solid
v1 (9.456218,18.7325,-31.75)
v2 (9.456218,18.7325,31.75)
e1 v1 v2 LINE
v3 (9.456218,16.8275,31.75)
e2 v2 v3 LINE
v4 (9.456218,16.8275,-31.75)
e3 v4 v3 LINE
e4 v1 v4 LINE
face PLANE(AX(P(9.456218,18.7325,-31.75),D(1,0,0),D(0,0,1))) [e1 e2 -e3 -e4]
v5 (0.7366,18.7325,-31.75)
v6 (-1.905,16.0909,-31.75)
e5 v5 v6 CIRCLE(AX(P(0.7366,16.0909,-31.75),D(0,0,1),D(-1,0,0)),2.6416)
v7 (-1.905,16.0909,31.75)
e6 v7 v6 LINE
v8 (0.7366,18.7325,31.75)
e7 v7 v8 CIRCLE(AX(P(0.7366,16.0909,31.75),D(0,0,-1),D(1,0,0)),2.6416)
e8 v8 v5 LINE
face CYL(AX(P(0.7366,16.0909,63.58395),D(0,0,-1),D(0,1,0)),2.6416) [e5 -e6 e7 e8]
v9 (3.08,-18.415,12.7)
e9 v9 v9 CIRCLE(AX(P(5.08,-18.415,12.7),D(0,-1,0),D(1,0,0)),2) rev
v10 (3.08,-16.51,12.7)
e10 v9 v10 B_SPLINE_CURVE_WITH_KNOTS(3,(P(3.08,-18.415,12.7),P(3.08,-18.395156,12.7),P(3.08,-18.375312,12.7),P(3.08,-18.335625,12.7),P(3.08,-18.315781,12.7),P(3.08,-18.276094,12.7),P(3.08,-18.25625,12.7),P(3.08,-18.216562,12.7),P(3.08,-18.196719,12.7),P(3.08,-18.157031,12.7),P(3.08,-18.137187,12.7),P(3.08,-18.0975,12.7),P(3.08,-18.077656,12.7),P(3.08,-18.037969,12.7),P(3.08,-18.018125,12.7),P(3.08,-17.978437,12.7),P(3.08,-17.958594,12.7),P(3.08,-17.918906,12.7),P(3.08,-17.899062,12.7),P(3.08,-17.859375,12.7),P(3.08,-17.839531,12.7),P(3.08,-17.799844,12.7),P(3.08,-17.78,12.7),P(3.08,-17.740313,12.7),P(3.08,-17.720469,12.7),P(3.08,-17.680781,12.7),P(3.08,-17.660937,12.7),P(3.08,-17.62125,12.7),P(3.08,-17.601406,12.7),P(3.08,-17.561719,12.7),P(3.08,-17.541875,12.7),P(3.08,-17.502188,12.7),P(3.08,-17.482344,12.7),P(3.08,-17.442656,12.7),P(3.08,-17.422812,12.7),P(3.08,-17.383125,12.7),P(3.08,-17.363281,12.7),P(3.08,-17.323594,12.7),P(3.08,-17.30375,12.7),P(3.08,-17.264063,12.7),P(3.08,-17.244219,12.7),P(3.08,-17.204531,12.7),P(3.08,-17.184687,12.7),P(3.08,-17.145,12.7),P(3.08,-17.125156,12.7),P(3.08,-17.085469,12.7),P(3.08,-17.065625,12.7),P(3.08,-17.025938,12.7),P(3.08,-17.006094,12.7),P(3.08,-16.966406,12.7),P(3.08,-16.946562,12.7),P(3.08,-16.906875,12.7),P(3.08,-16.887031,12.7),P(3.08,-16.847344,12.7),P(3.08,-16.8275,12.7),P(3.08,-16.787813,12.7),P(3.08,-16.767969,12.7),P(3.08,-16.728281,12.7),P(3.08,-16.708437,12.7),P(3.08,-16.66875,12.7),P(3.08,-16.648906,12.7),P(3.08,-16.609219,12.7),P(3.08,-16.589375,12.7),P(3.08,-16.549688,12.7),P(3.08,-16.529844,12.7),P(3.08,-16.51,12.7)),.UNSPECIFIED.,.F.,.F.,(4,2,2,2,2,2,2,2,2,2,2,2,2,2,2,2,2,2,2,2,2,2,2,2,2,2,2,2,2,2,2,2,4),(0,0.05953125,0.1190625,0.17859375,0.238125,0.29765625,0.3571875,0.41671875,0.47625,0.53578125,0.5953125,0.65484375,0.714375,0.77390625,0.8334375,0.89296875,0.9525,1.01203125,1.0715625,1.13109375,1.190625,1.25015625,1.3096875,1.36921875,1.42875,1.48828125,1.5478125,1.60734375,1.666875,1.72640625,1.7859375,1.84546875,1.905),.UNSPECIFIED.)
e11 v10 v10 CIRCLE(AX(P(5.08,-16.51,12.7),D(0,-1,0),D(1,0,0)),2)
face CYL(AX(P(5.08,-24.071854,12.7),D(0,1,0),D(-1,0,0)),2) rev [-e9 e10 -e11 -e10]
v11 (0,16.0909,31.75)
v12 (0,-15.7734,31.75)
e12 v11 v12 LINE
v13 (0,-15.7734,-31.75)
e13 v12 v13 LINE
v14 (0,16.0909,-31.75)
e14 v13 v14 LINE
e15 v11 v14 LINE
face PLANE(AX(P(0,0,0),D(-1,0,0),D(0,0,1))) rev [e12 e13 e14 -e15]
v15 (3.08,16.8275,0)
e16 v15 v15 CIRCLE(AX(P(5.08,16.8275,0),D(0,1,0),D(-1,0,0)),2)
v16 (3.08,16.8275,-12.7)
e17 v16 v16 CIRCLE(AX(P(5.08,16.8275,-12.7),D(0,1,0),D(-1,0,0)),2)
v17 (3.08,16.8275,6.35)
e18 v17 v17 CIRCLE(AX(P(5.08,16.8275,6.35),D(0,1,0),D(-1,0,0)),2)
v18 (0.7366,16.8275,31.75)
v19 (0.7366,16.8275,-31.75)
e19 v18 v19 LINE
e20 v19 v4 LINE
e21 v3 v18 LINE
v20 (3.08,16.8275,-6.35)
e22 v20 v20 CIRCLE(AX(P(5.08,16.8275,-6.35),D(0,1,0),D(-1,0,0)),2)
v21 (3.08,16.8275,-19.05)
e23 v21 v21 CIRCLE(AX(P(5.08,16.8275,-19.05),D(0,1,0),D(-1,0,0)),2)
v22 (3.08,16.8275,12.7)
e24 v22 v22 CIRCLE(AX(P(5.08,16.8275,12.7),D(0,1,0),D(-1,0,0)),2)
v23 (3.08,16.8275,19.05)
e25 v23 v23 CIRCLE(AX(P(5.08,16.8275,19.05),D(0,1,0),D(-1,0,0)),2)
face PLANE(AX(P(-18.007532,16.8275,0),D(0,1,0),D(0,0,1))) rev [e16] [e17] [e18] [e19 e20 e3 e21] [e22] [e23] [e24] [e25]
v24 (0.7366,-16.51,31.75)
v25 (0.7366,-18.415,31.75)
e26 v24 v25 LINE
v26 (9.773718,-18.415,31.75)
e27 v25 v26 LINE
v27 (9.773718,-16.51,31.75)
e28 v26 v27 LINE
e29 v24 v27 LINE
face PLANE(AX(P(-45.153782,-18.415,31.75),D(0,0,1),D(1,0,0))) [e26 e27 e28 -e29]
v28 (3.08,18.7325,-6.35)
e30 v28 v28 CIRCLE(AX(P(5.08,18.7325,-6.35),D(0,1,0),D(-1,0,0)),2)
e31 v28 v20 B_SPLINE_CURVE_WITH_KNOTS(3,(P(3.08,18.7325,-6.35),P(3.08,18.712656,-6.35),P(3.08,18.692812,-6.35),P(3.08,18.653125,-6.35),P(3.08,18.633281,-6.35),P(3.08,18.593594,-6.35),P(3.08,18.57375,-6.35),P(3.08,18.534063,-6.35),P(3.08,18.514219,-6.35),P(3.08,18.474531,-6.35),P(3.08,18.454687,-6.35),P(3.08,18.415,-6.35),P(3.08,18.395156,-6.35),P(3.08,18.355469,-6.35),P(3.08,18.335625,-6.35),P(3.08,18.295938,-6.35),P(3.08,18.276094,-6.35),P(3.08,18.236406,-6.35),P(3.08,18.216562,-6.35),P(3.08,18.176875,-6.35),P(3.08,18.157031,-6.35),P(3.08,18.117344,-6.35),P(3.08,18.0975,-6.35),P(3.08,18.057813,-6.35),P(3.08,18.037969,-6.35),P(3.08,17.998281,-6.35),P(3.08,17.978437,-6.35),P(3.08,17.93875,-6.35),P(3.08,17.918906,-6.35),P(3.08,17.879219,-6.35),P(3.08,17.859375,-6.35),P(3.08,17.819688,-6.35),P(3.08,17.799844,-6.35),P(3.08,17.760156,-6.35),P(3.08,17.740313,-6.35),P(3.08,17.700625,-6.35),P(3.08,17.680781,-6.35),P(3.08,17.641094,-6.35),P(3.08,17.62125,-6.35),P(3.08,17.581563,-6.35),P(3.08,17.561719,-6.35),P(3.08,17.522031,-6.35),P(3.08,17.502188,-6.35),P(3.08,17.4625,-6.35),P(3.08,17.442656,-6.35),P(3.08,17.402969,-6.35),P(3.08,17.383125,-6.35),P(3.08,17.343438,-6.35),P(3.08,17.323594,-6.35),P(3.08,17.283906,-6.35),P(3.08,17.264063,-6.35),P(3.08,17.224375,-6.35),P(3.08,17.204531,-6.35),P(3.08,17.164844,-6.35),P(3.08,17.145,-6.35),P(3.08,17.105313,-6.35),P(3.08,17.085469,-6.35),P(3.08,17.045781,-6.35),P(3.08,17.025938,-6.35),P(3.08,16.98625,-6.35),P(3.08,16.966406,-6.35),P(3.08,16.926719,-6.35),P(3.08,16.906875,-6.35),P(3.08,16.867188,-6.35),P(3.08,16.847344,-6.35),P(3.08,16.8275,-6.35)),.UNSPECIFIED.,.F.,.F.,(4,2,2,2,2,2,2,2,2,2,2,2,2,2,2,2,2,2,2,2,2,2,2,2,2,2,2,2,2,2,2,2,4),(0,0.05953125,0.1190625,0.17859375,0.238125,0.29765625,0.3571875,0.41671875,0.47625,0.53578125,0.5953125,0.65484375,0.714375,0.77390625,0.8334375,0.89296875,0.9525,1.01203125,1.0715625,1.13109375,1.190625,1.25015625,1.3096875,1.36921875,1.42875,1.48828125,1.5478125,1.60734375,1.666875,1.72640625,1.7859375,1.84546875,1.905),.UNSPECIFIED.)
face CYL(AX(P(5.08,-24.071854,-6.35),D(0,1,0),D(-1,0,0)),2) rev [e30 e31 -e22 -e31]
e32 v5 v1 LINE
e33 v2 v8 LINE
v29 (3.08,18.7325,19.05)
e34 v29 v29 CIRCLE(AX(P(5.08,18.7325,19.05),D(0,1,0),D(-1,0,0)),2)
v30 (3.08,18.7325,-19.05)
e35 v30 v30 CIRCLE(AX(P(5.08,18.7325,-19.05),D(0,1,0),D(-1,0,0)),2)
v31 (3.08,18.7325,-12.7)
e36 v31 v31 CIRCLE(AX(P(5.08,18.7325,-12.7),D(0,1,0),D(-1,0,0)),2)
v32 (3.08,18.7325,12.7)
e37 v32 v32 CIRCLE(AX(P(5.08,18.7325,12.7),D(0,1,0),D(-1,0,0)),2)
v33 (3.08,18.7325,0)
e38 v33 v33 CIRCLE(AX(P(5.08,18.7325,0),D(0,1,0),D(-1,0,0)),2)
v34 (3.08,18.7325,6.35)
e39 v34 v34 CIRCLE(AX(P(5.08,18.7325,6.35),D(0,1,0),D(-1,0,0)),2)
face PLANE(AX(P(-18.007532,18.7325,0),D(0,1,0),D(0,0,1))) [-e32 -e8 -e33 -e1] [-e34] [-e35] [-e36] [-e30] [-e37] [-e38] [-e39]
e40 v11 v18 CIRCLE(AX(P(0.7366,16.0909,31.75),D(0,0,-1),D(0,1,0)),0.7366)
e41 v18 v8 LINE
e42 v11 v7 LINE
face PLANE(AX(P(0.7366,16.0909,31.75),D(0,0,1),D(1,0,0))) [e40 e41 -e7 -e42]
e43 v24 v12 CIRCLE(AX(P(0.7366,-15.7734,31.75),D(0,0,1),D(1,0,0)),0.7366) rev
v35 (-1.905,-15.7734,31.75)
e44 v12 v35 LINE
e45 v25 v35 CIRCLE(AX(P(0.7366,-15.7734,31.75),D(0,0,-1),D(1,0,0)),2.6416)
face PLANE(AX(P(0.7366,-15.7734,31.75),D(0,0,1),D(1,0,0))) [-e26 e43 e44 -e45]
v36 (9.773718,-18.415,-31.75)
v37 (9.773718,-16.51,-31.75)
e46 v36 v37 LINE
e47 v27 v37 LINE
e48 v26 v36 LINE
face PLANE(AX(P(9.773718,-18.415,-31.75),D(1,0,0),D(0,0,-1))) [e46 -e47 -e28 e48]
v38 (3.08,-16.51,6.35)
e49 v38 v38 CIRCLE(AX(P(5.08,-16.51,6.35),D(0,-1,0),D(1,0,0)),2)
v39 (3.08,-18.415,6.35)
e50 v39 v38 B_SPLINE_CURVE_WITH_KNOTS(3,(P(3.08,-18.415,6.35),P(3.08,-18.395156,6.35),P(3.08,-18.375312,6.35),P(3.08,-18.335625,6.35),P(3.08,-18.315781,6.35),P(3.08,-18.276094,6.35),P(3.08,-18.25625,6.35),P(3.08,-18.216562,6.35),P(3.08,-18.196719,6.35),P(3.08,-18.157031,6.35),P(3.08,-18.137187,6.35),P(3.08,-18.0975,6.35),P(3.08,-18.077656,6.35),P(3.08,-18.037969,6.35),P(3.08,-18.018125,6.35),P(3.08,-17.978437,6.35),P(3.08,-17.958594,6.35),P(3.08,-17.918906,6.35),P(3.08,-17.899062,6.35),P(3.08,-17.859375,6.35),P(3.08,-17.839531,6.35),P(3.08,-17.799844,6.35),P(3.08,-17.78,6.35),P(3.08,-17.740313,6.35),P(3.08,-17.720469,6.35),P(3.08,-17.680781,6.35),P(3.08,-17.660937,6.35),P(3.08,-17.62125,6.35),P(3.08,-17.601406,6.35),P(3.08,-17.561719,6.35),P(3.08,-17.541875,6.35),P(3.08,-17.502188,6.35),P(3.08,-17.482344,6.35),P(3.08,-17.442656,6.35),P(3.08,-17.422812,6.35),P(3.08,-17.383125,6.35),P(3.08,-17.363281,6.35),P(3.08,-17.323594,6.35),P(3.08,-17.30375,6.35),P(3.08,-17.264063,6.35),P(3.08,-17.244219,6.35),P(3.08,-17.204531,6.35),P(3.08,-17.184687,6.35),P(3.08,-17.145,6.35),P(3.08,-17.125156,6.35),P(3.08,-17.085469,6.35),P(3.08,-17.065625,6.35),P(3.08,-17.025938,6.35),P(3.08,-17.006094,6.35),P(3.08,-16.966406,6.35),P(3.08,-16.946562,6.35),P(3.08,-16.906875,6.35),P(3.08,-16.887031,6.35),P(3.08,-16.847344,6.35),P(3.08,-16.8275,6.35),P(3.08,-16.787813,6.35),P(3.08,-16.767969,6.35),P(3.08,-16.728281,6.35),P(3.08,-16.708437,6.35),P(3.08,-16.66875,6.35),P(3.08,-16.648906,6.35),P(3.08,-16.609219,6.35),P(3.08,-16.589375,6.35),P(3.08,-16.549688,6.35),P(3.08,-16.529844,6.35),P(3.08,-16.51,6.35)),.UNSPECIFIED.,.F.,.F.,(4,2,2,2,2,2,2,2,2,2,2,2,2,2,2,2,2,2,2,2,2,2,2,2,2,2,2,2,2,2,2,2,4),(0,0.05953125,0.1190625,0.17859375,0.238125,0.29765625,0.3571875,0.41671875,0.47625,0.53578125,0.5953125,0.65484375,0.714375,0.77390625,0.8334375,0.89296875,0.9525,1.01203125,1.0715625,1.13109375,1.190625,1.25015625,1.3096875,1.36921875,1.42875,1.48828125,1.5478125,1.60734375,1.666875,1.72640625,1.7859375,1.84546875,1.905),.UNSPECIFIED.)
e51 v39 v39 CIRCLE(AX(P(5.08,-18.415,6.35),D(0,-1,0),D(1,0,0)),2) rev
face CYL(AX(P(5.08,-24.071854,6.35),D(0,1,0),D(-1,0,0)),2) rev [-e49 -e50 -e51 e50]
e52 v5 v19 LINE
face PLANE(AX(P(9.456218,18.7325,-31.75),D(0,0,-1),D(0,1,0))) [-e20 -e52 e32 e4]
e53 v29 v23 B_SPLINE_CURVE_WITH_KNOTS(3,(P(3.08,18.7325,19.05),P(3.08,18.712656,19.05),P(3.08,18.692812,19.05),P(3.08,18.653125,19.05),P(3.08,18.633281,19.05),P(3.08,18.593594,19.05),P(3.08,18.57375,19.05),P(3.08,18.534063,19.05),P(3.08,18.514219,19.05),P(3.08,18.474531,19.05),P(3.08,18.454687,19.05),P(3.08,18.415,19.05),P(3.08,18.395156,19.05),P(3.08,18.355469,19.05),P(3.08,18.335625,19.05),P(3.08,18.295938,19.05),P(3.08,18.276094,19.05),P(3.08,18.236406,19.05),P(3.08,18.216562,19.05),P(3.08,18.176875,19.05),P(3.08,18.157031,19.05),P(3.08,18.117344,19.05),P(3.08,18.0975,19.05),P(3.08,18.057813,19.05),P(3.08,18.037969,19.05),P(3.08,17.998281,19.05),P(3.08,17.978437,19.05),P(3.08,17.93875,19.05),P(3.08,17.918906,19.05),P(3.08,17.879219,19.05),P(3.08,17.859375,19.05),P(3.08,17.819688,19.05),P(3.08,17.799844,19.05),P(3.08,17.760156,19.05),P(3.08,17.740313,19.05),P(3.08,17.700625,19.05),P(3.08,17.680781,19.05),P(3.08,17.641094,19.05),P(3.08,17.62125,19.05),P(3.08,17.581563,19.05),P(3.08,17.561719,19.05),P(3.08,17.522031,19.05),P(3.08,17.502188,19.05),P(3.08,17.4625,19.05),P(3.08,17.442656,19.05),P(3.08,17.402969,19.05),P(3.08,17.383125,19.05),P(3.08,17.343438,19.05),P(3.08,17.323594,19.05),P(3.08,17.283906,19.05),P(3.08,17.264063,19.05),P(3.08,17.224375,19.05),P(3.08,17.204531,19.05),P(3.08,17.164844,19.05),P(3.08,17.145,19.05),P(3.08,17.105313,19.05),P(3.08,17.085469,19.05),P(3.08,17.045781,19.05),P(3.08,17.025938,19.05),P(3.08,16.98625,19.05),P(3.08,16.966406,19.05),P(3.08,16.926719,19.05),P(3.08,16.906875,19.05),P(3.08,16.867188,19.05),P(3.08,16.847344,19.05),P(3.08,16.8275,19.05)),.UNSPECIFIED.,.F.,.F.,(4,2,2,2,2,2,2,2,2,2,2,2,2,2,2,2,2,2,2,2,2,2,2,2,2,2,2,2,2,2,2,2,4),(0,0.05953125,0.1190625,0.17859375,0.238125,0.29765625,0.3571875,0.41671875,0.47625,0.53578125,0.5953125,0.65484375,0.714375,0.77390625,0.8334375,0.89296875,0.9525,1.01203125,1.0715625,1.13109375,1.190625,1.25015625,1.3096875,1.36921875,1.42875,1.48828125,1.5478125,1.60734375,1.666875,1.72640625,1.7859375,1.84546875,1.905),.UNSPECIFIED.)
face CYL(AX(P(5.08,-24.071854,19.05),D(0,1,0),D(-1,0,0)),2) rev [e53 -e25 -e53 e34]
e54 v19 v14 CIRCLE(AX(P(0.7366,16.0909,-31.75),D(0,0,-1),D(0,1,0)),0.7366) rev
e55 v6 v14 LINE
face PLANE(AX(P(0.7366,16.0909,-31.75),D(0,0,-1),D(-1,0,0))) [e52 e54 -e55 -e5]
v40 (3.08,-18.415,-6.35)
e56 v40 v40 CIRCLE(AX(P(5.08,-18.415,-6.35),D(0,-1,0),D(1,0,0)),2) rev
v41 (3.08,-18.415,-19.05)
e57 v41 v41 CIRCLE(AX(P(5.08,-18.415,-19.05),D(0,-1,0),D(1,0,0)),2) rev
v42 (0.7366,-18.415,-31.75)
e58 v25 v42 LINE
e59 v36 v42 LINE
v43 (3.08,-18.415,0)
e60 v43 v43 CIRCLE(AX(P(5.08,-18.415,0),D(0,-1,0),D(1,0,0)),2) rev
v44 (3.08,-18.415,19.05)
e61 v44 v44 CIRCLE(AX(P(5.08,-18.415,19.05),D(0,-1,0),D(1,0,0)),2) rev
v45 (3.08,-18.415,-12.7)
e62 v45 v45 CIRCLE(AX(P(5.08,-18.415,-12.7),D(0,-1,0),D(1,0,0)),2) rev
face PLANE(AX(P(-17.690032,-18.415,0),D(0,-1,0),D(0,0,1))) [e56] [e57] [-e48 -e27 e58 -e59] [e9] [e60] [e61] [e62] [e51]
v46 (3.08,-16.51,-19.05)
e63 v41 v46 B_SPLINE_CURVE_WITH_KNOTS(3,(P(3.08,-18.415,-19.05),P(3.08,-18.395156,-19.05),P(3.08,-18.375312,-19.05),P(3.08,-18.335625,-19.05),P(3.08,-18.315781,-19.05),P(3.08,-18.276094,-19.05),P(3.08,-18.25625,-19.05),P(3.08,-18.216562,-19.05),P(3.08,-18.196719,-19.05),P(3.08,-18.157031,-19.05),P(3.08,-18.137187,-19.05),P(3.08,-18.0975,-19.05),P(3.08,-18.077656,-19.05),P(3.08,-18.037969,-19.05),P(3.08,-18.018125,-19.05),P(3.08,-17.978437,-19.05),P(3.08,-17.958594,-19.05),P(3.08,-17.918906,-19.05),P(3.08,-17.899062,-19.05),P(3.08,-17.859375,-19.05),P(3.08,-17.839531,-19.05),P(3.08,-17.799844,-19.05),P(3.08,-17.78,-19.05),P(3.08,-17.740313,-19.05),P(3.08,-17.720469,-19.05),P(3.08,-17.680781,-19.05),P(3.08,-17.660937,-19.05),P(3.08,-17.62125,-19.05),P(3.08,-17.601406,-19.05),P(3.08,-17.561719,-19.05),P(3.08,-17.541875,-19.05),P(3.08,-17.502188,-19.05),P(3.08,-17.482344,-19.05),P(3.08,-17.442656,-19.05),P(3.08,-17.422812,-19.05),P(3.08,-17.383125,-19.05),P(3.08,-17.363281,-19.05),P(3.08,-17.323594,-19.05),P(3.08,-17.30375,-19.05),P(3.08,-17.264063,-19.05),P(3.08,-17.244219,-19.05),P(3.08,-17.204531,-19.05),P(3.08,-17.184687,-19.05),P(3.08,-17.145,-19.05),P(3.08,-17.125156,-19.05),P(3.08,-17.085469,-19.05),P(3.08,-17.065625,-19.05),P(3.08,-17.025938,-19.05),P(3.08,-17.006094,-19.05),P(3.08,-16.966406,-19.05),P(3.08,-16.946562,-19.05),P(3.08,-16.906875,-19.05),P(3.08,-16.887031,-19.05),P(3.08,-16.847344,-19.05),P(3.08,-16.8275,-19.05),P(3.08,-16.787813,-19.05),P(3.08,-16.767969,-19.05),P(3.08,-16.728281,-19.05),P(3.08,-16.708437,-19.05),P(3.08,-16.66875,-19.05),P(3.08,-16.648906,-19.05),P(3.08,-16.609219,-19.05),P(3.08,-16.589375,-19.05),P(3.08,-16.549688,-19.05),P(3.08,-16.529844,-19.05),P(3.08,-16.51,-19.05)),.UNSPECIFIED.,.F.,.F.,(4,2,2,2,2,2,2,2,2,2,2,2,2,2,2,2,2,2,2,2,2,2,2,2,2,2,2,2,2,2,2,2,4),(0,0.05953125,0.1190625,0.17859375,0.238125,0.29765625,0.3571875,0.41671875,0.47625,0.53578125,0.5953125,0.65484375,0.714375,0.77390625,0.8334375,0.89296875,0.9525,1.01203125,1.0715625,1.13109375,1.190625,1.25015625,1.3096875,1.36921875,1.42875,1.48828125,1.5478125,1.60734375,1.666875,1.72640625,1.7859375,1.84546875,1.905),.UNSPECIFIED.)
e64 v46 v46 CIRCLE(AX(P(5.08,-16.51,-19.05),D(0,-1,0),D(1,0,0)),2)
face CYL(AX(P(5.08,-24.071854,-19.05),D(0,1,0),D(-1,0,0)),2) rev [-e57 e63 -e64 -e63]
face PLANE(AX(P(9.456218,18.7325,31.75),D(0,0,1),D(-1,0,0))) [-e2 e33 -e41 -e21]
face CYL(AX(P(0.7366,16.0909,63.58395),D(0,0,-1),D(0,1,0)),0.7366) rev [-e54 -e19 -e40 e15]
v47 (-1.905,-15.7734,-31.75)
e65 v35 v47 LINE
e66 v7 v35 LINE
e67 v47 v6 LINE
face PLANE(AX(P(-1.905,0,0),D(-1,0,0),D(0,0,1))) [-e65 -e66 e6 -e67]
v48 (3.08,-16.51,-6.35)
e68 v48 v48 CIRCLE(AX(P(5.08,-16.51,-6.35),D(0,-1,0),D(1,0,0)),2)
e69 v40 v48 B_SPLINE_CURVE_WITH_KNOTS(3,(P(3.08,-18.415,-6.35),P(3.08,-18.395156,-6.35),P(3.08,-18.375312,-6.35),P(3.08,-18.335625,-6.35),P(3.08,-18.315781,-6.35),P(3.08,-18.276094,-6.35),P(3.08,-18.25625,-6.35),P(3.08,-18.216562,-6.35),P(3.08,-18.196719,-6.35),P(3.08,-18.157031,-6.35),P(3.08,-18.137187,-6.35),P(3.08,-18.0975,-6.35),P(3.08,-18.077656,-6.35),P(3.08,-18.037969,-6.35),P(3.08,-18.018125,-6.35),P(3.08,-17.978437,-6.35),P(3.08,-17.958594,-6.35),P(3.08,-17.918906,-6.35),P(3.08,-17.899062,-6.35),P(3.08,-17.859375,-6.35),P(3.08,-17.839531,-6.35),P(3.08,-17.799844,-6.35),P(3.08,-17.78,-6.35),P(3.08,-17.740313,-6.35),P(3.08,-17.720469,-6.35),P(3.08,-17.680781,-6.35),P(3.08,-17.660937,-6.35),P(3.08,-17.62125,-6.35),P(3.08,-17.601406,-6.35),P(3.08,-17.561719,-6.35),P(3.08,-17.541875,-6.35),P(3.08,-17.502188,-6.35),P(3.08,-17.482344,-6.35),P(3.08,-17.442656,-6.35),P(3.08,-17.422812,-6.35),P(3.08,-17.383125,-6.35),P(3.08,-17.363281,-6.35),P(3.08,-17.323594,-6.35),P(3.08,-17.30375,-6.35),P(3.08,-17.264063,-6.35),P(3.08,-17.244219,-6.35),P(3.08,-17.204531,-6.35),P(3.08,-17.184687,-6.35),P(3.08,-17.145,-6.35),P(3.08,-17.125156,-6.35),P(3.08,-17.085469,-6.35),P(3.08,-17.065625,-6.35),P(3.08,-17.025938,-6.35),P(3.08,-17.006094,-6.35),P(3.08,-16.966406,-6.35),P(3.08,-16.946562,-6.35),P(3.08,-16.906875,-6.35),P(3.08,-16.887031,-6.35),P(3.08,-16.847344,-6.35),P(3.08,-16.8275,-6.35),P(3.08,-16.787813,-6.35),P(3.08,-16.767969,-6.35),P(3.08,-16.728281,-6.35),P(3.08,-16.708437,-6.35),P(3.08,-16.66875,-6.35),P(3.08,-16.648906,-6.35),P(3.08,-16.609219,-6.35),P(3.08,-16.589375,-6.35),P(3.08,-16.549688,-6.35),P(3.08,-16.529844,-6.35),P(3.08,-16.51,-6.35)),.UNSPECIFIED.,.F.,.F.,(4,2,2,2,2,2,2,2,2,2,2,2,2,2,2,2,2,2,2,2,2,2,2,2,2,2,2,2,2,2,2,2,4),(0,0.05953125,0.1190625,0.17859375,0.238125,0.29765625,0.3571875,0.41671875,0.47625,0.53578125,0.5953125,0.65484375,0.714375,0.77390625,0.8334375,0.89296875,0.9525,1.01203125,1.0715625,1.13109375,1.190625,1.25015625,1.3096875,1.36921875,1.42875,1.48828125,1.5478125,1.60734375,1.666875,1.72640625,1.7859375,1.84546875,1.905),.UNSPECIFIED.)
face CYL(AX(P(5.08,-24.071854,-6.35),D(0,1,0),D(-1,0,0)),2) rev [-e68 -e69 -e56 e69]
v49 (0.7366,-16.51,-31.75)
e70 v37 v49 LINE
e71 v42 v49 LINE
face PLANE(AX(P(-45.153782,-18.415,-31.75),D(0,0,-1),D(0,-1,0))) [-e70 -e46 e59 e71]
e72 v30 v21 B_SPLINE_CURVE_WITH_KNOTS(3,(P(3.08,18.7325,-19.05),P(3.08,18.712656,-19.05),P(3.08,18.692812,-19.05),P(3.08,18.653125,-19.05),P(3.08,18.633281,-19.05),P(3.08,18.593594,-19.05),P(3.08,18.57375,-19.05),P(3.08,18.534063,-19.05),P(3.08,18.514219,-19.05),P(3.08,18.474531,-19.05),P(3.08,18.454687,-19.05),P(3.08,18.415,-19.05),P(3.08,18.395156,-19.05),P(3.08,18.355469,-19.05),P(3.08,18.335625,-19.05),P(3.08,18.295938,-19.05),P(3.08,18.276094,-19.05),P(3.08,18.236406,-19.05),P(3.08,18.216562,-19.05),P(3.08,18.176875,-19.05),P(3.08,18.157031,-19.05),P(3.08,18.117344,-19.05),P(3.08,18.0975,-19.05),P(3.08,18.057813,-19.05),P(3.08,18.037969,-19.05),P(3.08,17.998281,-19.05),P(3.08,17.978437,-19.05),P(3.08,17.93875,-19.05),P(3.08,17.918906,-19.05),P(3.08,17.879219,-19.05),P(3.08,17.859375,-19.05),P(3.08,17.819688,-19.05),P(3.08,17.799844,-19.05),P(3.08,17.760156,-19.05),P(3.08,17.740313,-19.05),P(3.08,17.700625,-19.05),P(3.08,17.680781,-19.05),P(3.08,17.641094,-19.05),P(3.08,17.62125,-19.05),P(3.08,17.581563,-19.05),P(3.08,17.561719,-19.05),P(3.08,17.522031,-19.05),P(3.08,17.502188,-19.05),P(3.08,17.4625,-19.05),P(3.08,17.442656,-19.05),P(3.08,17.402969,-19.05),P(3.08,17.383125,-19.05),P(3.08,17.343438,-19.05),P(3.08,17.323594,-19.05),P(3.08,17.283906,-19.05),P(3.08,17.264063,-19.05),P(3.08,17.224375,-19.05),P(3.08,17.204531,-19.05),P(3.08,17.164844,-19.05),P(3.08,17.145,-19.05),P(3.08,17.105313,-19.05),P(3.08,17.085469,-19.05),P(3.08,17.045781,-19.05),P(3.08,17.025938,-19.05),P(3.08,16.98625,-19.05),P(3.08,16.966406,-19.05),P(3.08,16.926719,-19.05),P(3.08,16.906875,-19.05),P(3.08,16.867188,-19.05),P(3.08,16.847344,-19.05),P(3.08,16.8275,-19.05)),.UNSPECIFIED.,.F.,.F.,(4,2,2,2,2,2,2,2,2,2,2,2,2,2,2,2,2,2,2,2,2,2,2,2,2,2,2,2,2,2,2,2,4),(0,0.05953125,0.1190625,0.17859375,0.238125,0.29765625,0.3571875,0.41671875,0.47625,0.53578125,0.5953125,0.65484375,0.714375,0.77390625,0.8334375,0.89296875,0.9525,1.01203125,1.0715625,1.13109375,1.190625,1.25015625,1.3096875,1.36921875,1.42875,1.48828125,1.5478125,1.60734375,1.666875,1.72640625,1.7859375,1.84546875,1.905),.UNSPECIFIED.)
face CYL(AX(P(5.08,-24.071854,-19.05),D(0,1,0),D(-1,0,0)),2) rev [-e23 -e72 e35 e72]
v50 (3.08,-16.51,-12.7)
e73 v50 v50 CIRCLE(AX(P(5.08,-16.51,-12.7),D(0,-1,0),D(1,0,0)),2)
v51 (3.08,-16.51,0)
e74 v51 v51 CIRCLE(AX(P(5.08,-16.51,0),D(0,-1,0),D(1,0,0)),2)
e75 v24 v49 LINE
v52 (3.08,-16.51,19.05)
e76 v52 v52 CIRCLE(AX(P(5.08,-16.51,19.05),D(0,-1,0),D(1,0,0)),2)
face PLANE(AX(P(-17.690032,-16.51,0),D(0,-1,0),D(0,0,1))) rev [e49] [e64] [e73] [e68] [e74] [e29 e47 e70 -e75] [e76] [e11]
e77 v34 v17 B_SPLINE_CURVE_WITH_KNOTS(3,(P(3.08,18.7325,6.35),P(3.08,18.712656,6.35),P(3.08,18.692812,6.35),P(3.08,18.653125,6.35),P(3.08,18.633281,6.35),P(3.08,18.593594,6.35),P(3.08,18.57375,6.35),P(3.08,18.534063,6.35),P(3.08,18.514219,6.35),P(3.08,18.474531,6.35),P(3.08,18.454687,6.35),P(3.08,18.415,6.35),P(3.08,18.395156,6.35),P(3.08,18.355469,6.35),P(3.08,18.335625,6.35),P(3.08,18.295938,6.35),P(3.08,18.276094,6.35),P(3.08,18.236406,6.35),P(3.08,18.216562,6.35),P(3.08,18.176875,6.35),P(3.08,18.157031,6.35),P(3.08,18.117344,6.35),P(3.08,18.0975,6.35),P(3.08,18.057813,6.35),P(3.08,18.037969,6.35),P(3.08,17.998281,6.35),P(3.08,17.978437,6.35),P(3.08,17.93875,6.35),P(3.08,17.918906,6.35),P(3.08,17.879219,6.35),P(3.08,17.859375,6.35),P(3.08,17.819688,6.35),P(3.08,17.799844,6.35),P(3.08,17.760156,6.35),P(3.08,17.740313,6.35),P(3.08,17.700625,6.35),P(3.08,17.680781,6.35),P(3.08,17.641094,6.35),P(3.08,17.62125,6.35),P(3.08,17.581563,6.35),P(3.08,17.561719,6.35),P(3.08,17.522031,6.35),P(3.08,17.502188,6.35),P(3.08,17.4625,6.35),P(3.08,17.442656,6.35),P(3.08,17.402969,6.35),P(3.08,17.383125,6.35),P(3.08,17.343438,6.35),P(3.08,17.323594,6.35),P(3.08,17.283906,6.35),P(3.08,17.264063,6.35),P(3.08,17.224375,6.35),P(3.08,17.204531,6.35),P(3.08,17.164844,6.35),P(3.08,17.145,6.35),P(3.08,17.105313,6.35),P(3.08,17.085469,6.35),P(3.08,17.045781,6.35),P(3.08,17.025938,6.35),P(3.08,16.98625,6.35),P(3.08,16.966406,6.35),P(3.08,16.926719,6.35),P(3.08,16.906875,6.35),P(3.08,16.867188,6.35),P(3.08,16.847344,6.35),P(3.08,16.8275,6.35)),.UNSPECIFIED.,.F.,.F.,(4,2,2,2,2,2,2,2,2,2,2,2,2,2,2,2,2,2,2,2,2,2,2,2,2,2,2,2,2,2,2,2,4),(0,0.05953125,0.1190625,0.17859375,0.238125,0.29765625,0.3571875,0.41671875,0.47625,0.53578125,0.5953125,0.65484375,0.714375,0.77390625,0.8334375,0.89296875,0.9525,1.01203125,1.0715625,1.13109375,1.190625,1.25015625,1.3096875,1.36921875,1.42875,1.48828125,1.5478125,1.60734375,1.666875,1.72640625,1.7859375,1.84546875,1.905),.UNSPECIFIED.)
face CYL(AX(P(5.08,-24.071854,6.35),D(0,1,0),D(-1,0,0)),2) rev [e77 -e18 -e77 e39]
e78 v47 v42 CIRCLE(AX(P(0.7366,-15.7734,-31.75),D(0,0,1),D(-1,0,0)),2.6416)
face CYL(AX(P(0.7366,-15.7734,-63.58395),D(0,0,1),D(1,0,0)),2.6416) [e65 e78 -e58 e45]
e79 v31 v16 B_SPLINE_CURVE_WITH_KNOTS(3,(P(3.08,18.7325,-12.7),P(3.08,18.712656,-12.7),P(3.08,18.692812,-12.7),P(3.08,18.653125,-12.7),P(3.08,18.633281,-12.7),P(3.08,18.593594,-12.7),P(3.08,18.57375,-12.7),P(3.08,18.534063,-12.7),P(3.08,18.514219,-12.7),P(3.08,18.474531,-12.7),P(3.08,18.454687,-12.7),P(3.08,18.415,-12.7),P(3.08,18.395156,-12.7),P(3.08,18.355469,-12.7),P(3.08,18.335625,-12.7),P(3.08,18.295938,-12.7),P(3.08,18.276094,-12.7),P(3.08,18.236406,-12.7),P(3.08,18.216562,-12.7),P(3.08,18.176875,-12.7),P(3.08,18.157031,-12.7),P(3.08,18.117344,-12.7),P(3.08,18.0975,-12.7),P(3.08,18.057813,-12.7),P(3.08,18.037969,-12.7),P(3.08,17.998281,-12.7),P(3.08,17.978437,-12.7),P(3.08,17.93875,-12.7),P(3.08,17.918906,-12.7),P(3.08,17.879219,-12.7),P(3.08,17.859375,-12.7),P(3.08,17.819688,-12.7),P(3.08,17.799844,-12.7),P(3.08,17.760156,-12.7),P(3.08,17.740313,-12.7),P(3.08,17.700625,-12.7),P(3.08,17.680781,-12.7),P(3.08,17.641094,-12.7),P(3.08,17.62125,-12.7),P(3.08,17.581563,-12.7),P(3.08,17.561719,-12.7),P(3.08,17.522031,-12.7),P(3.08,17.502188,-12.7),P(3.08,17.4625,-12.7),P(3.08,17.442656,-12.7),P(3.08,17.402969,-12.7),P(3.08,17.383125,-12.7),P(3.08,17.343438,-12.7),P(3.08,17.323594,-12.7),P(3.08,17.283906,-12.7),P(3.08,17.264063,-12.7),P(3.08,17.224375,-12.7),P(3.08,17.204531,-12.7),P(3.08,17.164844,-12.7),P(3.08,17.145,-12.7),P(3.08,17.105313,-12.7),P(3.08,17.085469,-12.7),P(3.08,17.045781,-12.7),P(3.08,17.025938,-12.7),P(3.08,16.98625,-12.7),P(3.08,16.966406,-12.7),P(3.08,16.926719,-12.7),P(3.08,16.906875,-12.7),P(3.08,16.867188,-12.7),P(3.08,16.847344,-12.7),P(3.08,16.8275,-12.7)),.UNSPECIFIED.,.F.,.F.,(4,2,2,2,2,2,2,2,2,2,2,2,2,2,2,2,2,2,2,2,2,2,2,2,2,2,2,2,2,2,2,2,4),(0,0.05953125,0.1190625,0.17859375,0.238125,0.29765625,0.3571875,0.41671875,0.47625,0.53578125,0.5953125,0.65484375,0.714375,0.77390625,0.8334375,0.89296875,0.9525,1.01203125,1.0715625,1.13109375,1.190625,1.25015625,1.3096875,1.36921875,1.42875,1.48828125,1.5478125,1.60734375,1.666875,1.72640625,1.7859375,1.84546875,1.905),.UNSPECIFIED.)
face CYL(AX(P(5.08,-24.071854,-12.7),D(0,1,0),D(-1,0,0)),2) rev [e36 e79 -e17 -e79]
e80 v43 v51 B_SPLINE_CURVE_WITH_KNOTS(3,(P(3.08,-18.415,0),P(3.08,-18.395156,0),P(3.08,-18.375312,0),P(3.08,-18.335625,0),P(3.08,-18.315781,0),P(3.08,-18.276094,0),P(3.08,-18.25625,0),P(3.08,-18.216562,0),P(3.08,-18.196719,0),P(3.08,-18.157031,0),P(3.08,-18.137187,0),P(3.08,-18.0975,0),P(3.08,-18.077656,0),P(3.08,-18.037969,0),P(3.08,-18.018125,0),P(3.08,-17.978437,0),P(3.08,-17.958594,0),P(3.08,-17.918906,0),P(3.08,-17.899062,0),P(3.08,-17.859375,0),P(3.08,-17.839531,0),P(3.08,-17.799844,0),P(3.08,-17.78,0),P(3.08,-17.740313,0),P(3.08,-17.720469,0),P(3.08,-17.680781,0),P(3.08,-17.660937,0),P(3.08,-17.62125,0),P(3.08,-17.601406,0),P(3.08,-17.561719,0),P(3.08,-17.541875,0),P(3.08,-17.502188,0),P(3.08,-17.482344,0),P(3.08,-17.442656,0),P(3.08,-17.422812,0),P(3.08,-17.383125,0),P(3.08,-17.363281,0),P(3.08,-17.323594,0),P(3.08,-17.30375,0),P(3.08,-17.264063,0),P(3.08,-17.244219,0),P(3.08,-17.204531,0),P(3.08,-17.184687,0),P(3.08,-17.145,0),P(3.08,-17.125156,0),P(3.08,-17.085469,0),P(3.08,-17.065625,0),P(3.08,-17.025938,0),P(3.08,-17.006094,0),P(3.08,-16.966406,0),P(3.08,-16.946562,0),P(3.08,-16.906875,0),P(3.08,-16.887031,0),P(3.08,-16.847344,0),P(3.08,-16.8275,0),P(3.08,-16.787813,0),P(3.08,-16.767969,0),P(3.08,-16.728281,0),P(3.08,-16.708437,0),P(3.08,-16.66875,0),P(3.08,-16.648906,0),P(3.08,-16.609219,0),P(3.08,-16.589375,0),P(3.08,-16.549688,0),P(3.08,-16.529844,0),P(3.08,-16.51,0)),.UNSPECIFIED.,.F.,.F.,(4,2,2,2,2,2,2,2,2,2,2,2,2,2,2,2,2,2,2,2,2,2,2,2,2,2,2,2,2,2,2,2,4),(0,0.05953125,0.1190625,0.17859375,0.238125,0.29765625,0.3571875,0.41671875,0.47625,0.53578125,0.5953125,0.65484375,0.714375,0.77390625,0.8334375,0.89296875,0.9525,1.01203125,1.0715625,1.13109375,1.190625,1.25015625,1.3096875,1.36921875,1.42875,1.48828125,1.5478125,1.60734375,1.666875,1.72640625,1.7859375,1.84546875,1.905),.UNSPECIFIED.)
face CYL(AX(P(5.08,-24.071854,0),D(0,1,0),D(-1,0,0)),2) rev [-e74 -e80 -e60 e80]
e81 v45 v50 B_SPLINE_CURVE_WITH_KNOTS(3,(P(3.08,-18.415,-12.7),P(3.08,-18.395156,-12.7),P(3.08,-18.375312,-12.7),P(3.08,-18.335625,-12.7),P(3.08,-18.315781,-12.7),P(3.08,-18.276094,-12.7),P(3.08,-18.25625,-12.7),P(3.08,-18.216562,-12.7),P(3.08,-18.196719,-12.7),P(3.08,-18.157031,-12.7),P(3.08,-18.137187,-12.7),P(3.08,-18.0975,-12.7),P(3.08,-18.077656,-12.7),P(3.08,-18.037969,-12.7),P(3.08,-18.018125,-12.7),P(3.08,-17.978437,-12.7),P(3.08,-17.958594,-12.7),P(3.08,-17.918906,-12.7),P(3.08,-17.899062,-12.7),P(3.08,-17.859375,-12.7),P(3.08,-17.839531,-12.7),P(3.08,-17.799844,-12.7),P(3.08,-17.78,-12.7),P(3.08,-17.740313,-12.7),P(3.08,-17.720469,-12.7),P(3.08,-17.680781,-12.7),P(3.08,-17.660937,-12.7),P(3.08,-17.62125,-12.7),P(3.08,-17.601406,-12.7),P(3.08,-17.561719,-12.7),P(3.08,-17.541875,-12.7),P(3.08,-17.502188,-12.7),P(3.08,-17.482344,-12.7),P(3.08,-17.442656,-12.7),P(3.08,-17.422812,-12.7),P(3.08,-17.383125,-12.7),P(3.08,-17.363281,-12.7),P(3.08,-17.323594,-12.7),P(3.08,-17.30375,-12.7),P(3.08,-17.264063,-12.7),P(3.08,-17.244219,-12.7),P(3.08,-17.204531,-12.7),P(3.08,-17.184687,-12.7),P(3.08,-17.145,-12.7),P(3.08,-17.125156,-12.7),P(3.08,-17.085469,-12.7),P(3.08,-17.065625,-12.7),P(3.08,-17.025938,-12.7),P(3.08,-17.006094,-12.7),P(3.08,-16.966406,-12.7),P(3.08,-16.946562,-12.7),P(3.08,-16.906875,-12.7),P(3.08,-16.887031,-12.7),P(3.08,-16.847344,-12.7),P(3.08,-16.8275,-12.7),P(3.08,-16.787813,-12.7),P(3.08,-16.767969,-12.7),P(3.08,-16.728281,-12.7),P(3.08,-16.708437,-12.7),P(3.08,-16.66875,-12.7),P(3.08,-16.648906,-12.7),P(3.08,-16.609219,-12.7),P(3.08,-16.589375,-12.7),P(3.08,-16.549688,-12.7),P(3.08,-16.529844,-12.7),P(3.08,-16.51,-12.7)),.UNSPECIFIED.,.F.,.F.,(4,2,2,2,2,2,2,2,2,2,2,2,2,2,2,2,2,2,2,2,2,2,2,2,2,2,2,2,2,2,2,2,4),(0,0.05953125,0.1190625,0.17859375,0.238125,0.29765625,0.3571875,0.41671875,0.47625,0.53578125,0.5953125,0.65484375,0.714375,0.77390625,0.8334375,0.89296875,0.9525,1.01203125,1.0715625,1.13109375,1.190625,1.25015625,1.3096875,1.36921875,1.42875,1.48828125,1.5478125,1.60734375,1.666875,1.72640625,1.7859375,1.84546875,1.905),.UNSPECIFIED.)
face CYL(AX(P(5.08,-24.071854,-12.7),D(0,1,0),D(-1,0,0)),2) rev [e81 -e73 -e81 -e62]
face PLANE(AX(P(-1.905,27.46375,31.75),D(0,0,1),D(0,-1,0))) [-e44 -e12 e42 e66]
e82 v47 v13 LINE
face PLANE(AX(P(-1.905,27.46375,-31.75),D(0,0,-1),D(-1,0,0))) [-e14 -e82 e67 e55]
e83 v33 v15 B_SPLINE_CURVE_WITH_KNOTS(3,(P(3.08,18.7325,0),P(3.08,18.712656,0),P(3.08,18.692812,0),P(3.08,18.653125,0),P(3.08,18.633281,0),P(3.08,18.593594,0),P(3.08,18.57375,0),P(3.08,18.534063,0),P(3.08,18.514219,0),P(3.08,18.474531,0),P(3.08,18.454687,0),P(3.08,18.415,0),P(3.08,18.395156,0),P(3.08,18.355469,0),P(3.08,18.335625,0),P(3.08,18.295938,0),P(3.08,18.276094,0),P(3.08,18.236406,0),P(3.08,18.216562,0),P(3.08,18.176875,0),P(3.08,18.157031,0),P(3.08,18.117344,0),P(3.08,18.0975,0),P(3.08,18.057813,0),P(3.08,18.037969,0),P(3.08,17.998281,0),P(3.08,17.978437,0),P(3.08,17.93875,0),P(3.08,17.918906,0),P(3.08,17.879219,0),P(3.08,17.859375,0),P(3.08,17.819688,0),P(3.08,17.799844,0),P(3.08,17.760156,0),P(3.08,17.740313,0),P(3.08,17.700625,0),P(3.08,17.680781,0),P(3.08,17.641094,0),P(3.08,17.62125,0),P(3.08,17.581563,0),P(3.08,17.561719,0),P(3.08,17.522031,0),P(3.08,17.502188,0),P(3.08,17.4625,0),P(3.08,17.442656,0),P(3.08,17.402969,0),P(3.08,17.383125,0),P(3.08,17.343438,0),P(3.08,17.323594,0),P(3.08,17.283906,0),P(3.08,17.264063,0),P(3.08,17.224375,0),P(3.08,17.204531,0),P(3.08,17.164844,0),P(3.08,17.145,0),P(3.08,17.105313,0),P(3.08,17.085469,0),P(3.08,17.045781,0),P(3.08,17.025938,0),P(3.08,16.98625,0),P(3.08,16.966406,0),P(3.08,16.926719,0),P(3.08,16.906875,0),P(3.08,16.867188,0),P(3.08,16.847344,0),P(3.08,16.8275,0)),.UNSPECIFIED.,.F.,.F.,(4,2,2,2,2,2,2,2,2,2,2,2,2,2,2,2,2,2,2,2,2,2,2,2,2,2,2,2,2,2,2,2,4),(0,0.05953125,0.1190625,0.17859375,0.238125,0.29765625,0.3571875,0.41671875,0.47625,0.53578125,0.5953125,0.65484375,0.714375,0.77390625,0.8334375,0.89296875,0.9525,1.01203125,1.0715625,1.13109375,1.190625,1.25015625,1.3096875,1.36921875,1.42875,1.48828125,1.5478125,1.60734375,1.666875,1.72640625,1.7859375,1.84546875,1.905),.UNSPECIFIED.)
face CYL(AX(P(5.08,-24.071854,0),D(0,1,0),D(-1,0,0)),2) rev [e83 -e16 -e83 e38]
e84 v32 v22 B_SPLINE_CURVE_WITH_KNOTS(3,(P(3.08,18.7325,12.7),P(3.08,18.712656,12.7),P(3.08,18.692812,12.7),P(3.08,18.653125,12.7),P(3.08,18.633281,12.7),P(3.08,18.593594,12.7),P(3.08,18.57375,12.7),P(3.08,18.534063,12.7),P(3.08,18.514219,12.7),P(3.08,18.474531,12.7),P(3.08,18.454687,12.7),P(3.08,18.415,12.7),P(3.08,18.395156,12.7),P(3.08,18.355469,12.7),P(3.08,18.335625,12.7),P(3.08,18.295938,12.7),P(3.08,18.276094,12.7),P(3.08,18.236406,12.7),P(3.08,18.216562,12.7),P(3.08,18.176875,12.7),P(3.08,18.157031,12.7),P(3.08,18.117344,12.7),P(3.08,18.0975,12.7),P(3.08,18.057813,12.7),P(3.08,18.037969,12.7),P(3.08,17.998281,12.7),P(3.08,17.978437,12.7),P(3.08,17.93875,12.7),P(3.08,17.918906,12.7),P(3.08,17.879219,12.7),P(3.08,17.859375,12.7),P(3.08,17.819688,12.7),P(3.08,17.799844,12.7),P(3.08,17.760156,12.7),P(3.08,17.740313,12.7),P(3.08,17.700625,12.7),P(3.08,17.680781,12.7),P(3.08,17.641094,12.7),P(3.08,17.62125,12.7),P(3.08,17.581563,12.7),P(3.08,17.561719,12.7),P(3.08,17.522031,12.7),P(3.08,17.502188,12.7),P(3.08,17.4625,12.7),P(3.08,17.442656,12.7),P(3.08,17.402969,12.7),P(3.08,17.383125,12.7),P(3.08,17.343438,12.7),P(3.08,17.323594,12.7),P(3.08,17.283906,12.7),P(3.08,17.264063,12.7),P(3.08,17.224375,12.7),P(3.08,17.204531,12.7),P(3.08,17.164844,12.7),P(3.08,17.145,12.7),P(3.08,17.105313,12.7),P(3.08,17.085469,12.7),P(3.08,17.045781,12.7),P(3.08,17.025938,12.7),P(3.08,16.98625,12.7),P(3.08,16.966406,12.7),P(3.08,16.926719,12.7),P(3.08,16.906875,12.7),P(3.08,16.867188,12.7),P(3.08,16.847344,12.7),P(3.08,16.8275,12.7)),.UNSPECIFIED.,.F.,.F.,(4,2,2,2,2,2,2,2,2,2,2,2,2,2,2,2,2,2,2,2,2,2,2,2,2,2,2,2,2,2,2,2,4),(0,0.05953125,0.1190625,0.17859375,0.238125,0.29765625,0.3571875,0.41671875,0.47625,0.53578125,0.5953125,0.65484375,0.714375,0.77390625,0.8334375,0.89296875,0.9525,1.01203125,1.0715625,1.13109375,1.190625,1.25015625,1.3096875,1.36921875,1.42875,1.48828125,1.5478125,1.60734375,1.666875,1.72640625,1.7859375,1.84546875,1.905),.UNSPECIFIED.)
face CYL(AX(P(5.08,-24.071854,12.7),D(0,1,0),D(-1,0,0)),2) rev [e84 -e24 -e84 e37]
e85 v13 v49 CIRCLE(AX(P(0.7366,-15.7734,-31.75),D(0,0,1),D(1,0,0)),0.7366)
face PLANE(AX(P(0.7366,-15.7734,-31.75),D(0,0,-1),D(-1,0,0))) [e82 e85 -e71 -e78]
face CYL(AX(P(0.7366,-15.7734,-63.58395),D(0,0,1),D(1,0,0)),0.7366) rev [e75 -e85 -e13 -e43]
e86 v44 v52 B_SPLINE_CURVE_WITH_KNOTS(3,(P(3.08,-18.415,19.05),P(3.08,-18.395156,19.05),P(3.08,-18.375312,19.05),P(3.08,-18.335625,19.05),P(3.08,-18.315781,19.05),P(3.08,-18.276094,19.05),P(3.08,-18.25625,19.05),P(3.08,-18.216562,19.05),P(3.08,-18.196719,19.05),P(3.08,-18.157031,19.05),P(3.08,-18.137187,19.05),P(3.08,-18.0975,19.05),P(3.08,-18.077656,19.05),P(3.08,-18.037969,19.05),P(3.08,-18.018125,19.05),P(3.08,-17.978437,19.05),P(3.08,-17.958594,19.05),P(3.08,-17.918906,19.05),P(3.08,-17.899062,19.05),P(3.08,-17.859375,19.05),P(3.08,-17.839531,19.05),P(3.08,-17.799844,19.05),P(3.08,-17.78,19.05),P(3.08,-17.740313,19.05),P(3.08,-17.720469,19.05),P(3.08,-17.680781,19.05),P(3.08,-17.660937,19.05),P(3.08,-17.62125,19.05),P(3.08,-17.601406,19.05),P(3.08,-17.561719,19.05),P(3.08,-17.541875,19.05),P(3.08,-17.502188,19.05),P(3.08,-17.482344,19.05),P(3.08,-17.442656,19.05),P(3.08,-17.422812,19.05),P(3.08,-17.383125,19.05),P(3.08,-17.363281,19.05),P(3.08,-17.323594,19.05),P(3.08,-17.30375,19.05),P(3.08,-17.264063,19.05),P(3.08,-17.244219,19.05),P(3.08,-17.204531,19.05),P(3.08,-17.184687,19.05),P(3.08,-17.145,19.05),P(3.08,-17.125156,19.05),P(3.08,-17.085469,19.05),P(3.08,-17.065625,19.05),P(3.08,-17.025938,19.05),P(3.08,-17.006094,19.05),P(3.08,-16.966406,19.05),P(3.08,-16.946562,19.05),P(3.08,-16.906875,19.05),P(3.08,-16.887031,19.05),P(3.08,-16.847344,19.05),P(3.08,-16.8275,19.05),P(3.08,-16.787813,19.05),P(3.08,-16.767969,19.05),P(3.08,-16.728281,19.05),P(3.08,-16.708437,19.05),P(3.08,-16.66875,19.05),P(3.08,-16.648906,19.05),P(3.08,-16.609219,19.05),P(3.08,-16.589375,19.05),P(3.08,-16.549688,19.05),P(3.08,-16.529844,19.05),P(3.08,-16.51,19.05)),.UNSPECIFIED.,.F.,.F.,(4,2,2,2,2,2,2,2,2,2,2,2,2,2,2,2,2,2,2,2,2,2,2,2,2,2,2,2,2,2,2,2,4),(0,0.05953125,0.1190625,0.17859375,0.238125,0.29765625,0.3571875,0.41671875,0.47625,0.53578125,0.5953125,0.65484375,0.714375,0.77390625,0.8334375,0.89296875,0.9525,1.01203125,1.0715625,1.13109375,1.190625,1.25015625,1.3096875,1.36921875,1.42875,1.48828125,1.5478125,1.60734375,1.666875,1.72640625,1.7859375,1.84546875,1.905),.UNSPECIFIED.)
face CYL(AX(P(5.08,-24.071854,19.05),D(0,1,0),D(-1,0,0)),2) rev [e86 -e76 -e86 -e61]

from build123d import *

# Parameters (mm, degrees)
SKETCH4_W              = 63.5
SKETCH4_H              = 54.9275
BASE_FLANGE1_DEPTH     = 1.905
SKETCHED_START         = -31.75
SKETCHED_BEND3_DEPTH   = 63.5
SKETCHED_BEND3_2_DEPTH = 63.5
CUT_EXTRUDE2_REACH     = 51.835
SKETCH20_R             = 2


# Read off the part's stored shape, not the designer's step: Sketched Bend3
# Sheet-metal steps are written as plain solids
with BuildPart() as part:
    # Sketch4 → Base-Flange1 (new body)
    with BuildSketch(Plane(origin=(0, 0, 0), x_dir=(0, 0, -1), z_dir=(1, 0, 0))):
        Rectangle(SKETCH4_W, SKETCH4_H)
    extrude(amount=-BASE_FLANGE1_DEPTH)

    # Sketched Bend3 outline → Sketched Bend3 (cut)
    with BuildSketch(Plane.XY.offset(SKETCHED_START)):
        with BuildLine():
            ThreePointArc((0, -18.310223013), (-1.375727285, -17.359629491), (-1.905, -15.7734))
            Line((-1.905, -15.7734), (-1.905, -27.46375))
            Line((-1.905, -27.46375), (0, -27.46375))
            Line((0, -27.46375), (0, -18.310223013))
        make_face()
        with BuildLine():
            Line((-1.905, 27.46375), (-1.905, 16.0909))
            ThreePointArc((-1.905, 16.0909), (-1.375727285, 17.677129491), (0, 18.627723013))
            Line((0, 18.627723013), (0, 27.46375))
            Line((0, 27.46375), (-1.905, 27.46375))
        make_face()
    extrude(amount=SKETCHED_BEND3_DEPTH, mode=Mode.SUBTRACT)

    # Sketched Bend3 2 outline → Sketched Bend3 2 (add)
    with BuildSketch(Plane.XY.offset(SKETCHED_START)):
        with BuildLine():
            Line((0, -15.7734), (0, -18.310223013))
            ThreePointArc((0, -18.310223013), (0.364592683, -18.388674577), (0.7366, -18.415))
            Line((0.7366, -18.415), (9.773717924, -18.415))
            Line((9.773717924, -18.415), (9.773717924, -16.51))
            Line((9.773717924, -16.51), (0.7366, -16.51))
            ThreePointArc((0.7366, -16.51), (0.215745145, -16.294254855), (0, -15.7734))
        make_face()
        with BuildLine():
            ThreePointArc((0.7366, 18.7325), (0.364592683, 18.706174577), (0, 18.627723013))
            Line((0, 18.627723013), (0, 16.0909))
            ThreePointArc((0, 16.0909), (0.215745145, 16.611754855), (0.7366, 16.8275))
            Line((0.7366, 16.8275), (9.456217924, 16.8275))
            Line((9.456217924, 16.8275), (9.456217924, 18.7325))
            Line((9.456217924, 18.7325), (0.7366, 18.7325))
        make_face()
    extrude(amount=SKETCHED_BEND3_2_DEPTH)

    # Cut-Extrude2: up to this face of the body (flat: up to its plane)
    cut_extrude2_end = Plane(part.part.faces().sort_by_distance((5.255158962, -18.415, 0))[0])
    # Sketch20 → Cut-Extrude2 (cut, up to the picked face)
    with BuildSketch(Plane(origin=(0, 18.7325, 0), x_dir=(1, 0, 0), z_dir=(0, 1, 0)), mode=Mode.PRIVATE) as cut_extrude2_sk1:
        with Locations(Location((5.08, -6.35, 0), (0, 0, 180))):
            Circle(SKETCH20_R)
    cut_extrude2_tool1 = split(extrude(cut_extrude2_sk1.sketch, amount=-CUT_EXTRUDE2_REACH, mode=Mode.PRIVATE), bisect_by=cut_extrude2_end, keep=Keep.BOTH, mode=Mode.PRIVATE)
    # Sketch20 → Cut-Extrude2 (cut, up to the picked face)
    with BuildSketch(Plane(origin=(0, 18.7325, 0), x_dir=(1, 0, 0), z_dir=(0, 1, 0)), mode=Mode.PRIVATE) as cut_extrude2_sk2:
        with Locations(Location((5.08, 0, 0), (0, 0, 180))):
            Circle(SKETCH20_R)
    cut_extrude2_tool2 = split(extrude(cut_extrude2_sk2.sketch, amount=-CUT_EXTRUDE2_REACH, mode=Mode.PRIVATE), bisect_by=cut_extrude2_end, keep=Keep.BOTH, mode=Mode.PRIVATE)
    # Sketch20 → Cut-Extrude2 (cut, up to the picked face)
    with BuildSketch(Plane(origin=(0, 18.7325, 0), x_dir=(1, 0, 0), z_dir=(0, 1, 0)), mode=Mode.PRIVATE) as cut_extrude2_sk3:
        with Locations(Location((5.08, 6.35, 0), (0, 0, 180))):
            Circle(SKETCH20_R)
    cut_extrude2_tool3 = split(extrude(cut_extrude2_sk3.sketch, amount=-CUT_EXTRUDE2_REACH, mode=Mode.PRIVATE), bisect_by=cut_extrude2_end, keep=Keep.BOTH, mode=Mode.PRIVATE)
    # Sketch20 → Cut-Extrude2 (cut, up to the picked face)
    with BuildSketch(Plane(origin=(0, 18.7325, 0), x_dir=(1, 0, 0), z_dir=(0, 1, 0)), mode=Mode.PRIVATE) as cut_extrude2_sk4:
        with Locations(Location((5.08, 12.7, 0), (0, 0, 180))):
            Circle(SKETCH20_R)
    cut_extrude2_tool4 = split(extrude(cut_extrude2_sk4.sketch, amount=-CUT_EXTRUDE2_REACH, mode=Mode.PRIVATE), bisect_by=cut_extrude2_end, keep=Keep.BOTH, mode=Mode.PRIVATE)
    # Sketch20 → Cut-Extrude2 (cut, up to the picked face)
    with BuildSketch(Plane(origin=(0, 18.7325, 0), x_dir=(1, 0, 0), z_dir=(0, 1, 0)), mode=Mode.PRIVATE) as cut_extrude2_sk5:
        with Locations(Location((5.08, 19.05, 0), (0, 0, 180))):
            Circle(SKETCH20_R)
    cut_extrude2_tool5 = split(extrude(cut_extrude2_sk5.sketch, amount=-CUT_EXTRUDE2_REACH, mode=Mode.PRIVATE), bisect_by=cut_extrude2_end, keep=Keep.BOTH, mode=Mode.PRIVATE)
    # Sketch20 → Cut-Extrude2 (cut, up to the picked face)
    with BuildSketch(Plane(origin=(0, 18.7325, 0), x_dir=(1, 0, 0), z_dir=(0, 1, 0)), mode=Mode.PRIVATE) as cut_extrude2_sk6:
        with Locations(Location((5.08, -12.7, 0), (0, 0, 180))):
            Circle(SKETCH20_R)
    cut_extrude2_tool6 = split(extrude(cut_extrude2_sk6.sketch, amount=-CUT_EXTRUDE2_REACH, mode=Mode.PRIVATE), bisect_by=cut_extrude2_end, keep=Keep.BOTH, mode=Mode.PRIVATE)
    # Sketch20 → Cut-Extrude2 (cut, up to the picked face)
    with BuildSketch(Plane(origin=(0, 18.7325, 0), x_dir=(1, 0, 0), z_dir=(0, 1, 0)), mode=Mode.PRIVATE) as cut_extrude2_sk7:
        with Locations(Location((5.08, -19.05, 0), (0, 0, 180))):
            Circle(SKETCH20_R)
    cut_extrude2_tool7 = split(extrude(cut_extrude2_sk7.sketch, amount=-CUT_EXTRUDE2_REACH, mode=Mode.PRIVATE), bisect_by=cut_extrude2_end, keep=Keep.BOTH, mode=Mode.PRIVATE)
    add(cut_extrude2_tool1.solids().sort_by(Axis((5.08, 18.7325, 6.35), (0, -1, 0)))[0], mode=Mode.SUBTRACT)
    add(cut_extrude2_tool2.solids().sort_by(Axis((5.08, 18.7325, 0), (0, -1, 0)))[0], mode=Mode.SUBTRACT)
    add(cut_extrude2_tool3.solids().sort_by(Axis((5.08, 18.7325, -6.35), (0, -1, 0)))[0], mode=Mode.SUBTRACT)
    add(cut_extrude2_tool4.solids().sort_by(Axis((5.08, 18.7325, -12.7), (0, -1, 0)))[0], mode=Mode.SUBTRACT)
    add(cut_extrude2_tool5.solids().sort_by(Axis((5.08, 18.7325, -19.05), (0, -1, 0)))[0], mode=Mode.SUBTRACT)
    add(cut_extrude2_tool6.solids().sort_by(Axis((5.08, 18.7325, 12.7), (0, -1, 0)))[0], mode=Mode.SUBTRACT)
    add(cut_extrude2_tool7.solids().sort_by(Axis((5.08, 18.7325, 19.05), (0, -1, 0)))[0], mode=Mode.SUBTRACT)


solid = part.part
